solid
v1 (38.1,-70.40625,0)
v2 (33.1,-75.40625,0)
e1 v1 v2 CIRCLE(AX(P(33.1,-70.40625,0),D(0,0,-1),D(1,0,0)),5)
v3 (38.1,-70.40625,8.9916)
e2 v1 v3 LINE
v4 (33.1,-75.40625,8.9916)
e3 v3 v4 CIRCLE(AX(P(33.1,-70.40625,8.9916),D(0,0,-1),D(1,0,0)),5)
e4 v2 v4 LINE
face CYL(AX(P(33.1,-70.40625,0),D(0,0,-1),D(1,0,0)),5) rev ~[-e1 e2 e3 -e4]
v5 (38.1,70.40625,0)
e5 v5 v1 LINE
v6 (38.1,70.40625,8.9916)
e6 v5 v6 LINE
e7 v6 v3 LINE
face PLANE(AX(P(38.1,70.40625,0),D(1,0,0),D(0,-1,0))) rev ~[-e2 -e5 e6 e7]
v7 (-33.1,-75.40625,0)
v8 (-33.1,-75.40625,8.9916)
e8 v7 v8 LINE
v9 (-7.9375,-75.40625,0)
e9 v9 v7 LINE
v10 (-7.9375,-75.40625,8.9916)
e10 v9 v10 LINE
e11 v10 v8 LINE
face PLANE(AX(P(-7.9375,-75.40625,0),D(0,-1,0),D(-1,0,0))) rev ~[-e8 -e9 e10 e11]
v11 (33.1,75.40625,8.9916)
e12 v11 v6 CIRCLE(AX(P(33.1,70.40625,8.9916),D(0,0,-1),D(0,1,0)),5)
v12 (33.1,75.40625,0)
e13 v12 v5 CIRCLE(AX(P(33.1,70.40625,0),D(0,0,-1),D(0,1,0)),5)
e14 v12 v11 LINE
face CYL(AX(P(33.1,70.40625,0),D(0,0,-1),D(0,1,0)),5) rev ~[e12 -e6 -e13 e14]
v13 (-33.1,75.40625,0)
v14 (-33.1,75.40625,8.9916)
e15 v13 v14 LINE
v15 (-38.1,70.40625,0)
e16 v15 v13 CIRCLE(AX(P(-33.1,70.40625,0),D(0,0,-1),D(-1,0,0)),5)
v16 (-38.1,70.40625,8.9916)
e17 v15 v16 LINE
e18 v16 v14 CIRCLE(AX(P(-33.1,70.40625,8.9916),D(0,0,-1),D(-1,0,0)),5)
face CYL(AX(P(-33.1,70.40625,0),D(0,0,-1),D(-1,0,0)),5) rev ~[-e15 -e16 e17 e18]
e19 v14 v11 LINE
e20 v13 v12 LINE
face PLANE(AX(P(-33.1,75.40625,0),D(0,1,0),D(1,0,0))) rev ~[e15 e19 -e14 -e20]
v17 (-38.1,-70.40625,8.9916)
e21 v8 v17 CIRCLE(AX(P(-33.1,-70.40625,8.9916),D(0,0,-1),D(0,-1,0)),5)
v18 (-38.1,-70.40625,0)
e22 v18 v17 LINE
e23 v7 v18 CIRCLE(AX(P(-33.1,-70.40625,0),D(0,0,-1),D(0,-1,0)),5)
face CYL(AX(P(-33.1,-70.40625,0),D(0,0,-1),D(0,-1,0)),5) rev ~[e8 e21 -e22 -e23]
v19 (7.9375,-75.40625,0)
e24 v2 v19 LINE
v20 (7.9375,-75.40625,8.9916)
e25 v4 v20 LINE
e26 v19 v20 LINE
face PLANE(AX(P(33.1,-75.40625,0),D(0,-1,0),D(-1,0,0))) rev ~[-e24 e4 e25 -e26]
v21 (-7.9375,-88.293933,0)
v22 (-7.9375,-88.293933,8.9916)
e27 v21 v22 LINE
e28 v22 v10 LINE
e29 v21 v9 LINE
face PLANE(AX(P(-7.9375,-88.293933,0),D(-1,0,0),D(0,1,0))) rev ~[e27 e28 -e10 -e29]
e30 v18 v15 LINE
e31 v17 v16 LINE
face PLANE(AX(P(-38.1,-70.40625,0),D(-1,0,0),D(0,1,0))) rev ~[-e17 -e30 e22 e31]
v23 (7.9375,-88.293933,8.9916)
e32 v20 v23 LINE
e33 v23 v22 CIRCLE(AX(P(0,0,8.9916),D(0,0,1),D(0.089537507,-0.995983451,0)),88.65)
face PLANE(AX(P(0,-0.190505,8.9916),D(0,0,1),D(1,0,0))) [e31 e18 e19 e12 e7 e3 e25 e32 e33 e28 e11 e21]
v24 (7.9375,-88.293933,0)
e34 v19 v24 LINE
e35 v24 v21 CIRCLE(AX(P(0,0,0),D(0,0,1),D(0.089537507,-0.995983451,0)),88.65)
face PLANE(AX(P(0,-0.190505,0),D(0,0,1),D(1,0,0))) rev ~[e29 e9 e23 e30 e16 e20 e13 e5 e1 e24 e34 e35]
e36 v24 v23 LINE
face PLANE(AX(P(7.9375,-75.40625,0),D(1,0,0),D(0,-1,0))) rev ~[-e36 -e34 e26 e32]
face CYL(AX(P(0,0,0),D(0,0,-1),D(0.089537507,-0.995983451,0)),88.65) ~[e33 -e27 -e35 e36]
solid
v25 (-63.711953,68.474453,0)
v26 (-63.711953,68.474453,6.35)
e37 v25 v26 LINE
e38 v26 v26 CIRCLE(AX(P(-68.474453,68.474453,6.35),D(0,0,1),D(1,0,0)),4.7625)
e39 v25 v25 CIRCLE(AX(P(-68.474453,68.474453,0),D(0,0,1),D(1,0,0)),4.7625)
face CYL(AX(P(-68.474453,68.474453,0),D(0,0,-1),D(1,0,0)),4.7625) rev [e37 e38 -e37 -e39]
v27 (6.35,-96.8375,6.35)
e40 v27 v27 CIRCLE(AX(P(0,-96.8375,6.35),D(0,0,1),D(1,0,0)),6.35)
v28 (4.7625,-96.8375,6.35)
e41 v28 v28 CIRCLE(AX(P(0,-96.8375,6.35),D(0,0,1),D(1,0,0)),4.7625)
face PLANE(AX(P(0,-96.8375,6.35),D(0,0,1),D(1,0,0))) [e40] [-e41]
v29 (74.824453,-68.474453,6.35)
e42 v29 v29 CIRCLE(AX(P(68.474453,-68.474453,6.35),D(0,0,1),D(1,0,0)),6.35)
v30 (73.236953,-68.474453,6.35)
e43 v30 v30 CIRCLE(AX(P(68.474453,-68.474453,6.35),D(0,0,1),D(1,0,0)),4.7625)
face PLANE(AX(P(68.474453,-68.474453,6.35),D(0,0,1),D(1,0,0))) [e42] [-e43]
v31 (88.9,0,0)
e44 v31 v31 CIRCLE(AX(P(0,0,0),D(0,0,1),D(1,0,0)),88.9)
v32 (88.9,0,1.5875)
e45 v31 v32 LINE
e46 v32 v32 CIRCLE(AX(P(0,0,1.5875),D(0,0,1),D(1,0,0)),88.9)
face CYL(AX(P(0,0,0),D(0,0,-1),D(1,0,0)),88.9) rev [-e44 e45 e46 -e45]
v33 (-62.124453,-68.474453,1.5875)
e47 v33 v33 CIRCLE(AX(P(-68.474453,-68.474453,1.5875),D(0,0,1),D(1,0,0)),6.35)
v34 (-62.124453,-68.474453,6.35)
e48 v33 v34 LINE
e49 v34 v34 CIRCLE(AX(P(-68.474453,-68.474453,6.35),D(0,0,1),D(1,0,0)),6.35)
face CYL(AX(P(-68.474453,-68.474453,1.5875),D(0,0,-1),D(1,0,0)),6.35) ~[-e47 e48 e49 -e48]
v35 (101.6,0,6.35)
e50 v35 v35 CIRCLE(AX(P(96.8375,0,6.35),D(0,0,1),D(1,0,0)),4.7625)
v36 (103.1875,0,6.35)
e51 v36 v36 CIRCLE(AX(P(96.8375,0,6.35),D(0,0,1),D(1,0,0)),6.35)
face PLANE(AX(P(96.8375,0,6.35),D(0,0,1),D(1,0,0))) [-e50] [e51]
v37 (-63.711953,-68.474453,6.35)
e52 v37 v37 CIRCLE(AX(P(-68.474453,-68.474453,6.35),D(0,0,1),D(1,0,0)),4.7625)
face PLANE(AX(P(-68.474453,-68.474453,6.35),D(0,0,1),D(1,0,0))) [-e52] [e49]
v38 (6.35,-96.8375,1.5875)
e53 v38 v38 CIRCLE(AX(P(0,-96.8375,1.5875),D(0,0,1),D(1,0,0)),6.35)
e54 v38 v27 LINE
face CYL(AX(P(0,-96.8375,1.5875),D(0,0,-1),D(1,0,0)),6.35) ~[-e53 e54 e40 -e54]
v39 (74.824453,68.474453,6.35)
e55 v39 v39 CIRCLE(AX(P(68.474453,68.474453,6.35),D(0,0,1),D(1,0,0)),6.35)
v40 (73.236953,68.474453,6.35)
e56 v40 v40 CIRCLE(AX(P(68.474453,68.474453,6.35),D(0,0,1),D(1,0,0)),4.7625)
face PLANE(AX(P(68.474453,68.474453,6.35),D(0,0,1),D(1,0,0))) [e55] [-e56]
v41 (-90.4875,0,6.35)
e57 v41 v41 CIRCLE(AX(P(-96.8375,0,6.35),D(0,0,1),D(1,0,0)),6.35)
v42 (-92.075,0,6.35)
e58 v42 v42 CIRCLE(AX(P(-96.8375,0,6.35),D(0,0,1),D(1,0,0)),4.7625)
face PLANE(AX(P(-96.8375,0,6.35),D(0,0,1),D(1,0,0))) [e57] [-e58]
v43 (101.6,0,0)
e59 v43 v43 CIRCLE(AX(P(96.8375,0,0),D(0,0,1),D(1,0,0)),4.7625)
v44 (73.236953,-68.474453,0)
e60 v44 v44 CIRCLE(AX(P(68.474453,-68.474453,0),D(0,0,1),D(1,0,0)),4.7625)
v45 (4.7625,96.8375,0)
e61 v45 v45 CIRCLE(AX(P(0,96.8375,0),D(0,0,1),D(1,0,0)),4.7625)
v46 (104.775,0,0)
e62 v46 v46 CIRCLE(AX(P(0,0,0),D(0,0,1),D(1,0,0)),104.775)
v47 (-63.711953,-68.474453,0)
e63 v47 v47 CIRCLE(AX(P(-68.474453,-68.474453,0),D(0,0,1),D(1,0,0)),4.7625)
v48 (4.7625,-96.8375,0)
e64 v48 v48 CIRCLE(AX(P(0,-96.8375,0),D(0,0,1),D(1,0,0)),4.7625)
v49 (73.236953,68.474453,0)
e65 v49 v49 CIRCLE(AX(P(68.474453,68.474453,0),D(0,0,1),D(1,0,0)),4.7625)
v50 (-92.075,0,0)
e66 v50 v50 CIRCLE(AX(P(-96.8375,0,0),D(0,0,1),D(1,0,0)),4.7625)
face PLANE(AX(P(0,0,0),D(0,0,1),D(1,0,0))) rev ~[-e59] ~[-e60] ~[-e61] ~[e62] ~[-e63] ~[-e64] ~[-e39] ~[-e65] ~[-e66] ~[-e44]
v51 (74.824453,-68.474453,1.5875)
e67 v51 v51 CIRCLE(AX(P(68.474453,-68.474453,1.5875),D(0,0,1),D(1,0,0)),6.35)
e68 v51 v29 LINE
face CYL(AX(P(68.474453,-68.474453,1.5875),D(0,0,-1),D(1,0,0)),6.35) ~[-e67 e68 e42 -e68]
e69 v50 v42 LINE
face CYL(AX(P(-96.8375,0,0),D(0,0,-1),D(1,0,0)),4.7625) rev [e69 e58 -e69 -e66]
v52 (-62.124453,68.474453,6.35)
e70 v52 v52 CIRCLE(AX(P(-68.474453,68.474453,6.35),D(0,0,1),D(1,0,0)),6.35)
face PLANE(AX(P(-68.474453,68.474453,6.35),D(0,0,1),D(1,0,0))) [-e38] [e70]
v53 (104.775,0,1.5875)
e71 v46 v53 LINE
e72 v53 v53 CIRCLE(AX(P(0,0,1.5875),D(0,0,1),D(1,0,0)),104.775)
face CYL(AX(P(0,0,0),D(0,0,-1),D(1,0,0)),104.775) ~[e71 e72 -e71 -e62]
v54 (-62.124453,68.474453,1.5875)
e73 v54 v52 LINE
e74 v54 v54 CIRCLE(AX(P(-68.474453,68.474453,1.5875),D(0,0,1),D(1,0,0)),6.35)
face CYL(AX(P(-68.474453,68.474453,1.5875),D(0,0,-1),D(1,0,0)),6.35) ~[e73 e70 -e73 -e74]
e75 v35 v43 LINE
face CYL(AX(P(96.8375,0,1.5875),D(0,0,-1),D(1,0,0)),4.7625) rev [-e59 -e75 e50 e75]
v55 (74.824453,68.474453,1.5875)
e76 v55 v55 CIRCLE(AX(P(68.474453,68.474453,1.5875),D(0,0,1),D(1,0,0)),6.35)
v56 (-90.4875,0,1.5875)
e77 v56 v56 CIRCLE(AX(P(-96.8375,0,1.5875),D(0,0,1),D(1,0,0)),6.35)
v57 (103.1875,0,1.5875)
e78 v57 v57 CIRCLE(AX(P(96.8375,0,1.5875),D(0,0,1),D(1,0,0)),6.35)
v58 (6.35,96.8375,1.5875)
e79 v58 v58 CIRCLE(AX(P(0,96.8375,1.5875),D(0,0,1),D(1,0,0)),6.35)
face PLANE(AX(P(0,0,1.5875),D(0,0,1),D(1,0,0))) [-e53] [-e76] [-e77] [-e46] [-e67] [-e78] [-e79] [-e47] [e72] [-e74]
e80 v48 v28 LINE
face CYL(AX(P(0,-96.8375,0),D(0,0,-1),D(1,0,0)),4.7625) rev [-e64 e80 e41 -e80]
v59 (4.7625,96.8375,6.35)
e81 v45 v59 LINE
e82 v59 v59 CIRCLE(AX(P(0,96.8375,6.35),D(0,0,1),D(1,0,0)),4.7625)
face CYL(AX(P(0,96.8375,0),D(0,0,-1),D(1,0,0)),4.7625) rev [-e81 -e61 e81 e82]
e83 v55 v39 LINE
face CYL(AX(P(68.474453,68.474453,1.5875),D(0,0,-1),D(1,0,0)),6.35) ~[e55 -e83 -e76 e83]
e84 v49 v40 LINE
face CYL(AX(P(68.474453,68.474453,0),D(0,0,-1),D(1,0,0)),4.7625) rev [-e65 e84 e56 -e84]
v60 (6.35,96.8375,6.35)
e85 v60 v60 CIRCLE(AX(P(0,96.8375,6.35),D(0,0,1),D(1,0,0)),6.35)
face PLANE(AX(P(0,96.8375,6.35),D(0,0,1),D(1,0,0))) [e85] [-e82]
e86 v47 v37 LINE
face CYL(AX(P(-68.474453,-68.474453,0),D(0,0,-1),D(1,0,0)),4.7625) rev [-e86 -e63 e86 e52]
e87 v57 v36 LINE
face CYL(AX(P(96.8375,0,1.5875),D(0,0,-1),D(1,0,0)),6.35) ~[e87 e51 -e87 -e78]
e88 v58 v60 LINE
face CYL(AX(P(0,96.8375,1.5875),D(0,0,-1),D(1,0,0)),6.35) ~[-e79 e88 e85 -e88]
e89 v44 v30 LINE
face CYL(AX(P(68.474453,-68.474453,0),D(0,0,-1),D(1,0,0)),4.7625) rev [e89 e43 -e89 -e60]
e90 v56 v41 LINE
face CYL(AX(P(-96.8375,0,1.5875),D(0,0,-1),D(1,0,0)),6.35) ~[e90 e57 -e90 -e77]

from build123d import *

# Parameters (mm, degrees)
F1_DEPTH = 8.9916
F2_R     = 104.775
F2_R_2   = 4.7625
F2_R_3   = 88.9
F3_DEPTH = 1.5875
F4_R     = 6.35
F4_R_2   = 4.7625
F5_DEPTH = 4.7625


# Not quite as in the source:
# - a feature of the source that left no trace in its solid (it failed there, or was rolled back) is left out
# - the program builds the solid bodies; features that only make, move or delete a surface that nothing else refers to are left out


with BuildPart() as f1:
    # F0 (on Top) → F1 (new body)
    with BuildSketch(Plane.XY):
        with BuildLine():
            ThreePointArc((7.9375, -88.2939329385), (65.4311923894, -59.8128879298), (88.65, 0))
            ThreePointArc((88.65, 0), (-59.8128879298, 65.4311923894), (-7.9375, -88.2939329385))
            Line((-7.9375, -88.2939329385), (-7.9375, -75.40625))
            Line((-7.9375, -75.40625), (-33.1, -75.40625))
            ThreePointArc((-33.1, -75.40625), (-36.6355339059, -73.9417839059), (-38.1, -70.40625))
            Line((-38.1, -70.40625), (-38.1, 70.40625))
            ThreePointArc((-38.1, 70.40625), (-36.6355339059, 73.9417839059), (-33.1, 75.40625))
            Line((-33.1, 75.40625), (33.1, 75.40625))
            ThreePointArc((33.1, 75.40625), (36.6355339059, 73.9417839059), (38.1, 70.40625))
            Line((38.1, 70.40625), (38.1, -70.40625))
            ThreePointArc((38.1, -70.40625), (36.6355339059, -73.9417839059), (33.1, -75.40625))
            Line((33.1, -75.40625), (7.9375, -75.40625))
            Line((7.9375, -75.40625), (7.9375, -88.2939329385))
        make_face()
    extrude(amount=F1_DEPTH)


with BuildPart() as f3:
    # F2 (on Top) → F3 (new body)
    with BuildSketch(Plane.XY):
        Circle(F2_R)
        with Locations((-68.4744529232, -68.4744529232)):
            Circle(F2_R_2, mode=Mode.SUBTRACT)
        with Locations((0, -96.8375)):
            Circle(F2_R_2, mode=Mode.SUBTRACT)
        with Locations((68.4744529232, -68.4744529232)):
            Circle(F2_R_2, mode=Mode.SUBTRACT)
        with Locations((-96.8375, 0)):
            Circle(F2_R_2, mode=Mode.SUBTRACT)
        with Locations((-68.4744529232, 68.4744529232)):
            Circle(F2_R_2, mode=Mode.SUBTRACT)
        Circle(F2_R_3, mode=Mode.SUBTRACT)
        with Locations((96.8375, 0)):
            Circle(F2_R_2, mode=Mode.SUBTRACT)
        with Locations((0, 96.8375)):
            Circle(F2_R_2, mode=Mode.SUBTRACT)
        with Locations((68.4744529232, 68.4744529232)):
            Circle(F2_R_2, mode=Mode.SUBTRACT)
    extrude(amount=F3_DEPTH)

    # F4 (on face) → F5 (join)
    with BuildSketch(Plane.XY.offset(1.5875)):
        with Locations((96.8375, 0)):
            Circle(F4_R)
        with Locations((96.8375, 0)):
            Circle(F4_R_2, mode=Mode.SUBTRACT)
        with Locations((68.4744529232, 68.4744529232)):
            Circle(F4_R)
        with Locations((68.4744529232, 68.4744529232)):
            Circle(F4_R_2, mode=Mode.SUBTRACT)
        with Locations((0, 96.8375)):
            Circle(F4_R)
        with Locations((0, 96.8375)):
            Circle(F4_R_2, mode=Mode.SUBTRACT)
        with Locations((-68.4744529232, 68.4744529232)):
            Circle(F4_R)
        with Locations((-68.4744529232, 68.4744529232)):
            Circle(F4_R_2, mode=Mode.SUBTRACT)
        with Locations((-96.8375, 0)):
            Circle(F4_R)
        with Locations((-96.8375, 0)):
            Circle(F4_R_2, mode=Mode.SUBTRACT)
        with Locations((-68.4744529232, -68.4744529232)):
            Circle(F4_R)
        with Locations((-68.4744529232, -68.4744529232)):
            Circle(F4_R_2, mode=Mode.SUBTRACT)
        with Locations((0, -96.8375)):
            Circle(F4_R)
        with Locations((0, -96.8375)):
            Circle(F4_R_2, mode=Mode.SUBTRACT)
        with Locations((68.4744529232, -68.4744529232)):
            Circle(F4_R)
        with Locations((68.4744529232, -68.4744529232)):
            Circle(F4_R_2, mode=Mode.SUBTRACT)
    extrude(amount=F5_DEPTH)


solid = Compound([f1.part, f3.part])
